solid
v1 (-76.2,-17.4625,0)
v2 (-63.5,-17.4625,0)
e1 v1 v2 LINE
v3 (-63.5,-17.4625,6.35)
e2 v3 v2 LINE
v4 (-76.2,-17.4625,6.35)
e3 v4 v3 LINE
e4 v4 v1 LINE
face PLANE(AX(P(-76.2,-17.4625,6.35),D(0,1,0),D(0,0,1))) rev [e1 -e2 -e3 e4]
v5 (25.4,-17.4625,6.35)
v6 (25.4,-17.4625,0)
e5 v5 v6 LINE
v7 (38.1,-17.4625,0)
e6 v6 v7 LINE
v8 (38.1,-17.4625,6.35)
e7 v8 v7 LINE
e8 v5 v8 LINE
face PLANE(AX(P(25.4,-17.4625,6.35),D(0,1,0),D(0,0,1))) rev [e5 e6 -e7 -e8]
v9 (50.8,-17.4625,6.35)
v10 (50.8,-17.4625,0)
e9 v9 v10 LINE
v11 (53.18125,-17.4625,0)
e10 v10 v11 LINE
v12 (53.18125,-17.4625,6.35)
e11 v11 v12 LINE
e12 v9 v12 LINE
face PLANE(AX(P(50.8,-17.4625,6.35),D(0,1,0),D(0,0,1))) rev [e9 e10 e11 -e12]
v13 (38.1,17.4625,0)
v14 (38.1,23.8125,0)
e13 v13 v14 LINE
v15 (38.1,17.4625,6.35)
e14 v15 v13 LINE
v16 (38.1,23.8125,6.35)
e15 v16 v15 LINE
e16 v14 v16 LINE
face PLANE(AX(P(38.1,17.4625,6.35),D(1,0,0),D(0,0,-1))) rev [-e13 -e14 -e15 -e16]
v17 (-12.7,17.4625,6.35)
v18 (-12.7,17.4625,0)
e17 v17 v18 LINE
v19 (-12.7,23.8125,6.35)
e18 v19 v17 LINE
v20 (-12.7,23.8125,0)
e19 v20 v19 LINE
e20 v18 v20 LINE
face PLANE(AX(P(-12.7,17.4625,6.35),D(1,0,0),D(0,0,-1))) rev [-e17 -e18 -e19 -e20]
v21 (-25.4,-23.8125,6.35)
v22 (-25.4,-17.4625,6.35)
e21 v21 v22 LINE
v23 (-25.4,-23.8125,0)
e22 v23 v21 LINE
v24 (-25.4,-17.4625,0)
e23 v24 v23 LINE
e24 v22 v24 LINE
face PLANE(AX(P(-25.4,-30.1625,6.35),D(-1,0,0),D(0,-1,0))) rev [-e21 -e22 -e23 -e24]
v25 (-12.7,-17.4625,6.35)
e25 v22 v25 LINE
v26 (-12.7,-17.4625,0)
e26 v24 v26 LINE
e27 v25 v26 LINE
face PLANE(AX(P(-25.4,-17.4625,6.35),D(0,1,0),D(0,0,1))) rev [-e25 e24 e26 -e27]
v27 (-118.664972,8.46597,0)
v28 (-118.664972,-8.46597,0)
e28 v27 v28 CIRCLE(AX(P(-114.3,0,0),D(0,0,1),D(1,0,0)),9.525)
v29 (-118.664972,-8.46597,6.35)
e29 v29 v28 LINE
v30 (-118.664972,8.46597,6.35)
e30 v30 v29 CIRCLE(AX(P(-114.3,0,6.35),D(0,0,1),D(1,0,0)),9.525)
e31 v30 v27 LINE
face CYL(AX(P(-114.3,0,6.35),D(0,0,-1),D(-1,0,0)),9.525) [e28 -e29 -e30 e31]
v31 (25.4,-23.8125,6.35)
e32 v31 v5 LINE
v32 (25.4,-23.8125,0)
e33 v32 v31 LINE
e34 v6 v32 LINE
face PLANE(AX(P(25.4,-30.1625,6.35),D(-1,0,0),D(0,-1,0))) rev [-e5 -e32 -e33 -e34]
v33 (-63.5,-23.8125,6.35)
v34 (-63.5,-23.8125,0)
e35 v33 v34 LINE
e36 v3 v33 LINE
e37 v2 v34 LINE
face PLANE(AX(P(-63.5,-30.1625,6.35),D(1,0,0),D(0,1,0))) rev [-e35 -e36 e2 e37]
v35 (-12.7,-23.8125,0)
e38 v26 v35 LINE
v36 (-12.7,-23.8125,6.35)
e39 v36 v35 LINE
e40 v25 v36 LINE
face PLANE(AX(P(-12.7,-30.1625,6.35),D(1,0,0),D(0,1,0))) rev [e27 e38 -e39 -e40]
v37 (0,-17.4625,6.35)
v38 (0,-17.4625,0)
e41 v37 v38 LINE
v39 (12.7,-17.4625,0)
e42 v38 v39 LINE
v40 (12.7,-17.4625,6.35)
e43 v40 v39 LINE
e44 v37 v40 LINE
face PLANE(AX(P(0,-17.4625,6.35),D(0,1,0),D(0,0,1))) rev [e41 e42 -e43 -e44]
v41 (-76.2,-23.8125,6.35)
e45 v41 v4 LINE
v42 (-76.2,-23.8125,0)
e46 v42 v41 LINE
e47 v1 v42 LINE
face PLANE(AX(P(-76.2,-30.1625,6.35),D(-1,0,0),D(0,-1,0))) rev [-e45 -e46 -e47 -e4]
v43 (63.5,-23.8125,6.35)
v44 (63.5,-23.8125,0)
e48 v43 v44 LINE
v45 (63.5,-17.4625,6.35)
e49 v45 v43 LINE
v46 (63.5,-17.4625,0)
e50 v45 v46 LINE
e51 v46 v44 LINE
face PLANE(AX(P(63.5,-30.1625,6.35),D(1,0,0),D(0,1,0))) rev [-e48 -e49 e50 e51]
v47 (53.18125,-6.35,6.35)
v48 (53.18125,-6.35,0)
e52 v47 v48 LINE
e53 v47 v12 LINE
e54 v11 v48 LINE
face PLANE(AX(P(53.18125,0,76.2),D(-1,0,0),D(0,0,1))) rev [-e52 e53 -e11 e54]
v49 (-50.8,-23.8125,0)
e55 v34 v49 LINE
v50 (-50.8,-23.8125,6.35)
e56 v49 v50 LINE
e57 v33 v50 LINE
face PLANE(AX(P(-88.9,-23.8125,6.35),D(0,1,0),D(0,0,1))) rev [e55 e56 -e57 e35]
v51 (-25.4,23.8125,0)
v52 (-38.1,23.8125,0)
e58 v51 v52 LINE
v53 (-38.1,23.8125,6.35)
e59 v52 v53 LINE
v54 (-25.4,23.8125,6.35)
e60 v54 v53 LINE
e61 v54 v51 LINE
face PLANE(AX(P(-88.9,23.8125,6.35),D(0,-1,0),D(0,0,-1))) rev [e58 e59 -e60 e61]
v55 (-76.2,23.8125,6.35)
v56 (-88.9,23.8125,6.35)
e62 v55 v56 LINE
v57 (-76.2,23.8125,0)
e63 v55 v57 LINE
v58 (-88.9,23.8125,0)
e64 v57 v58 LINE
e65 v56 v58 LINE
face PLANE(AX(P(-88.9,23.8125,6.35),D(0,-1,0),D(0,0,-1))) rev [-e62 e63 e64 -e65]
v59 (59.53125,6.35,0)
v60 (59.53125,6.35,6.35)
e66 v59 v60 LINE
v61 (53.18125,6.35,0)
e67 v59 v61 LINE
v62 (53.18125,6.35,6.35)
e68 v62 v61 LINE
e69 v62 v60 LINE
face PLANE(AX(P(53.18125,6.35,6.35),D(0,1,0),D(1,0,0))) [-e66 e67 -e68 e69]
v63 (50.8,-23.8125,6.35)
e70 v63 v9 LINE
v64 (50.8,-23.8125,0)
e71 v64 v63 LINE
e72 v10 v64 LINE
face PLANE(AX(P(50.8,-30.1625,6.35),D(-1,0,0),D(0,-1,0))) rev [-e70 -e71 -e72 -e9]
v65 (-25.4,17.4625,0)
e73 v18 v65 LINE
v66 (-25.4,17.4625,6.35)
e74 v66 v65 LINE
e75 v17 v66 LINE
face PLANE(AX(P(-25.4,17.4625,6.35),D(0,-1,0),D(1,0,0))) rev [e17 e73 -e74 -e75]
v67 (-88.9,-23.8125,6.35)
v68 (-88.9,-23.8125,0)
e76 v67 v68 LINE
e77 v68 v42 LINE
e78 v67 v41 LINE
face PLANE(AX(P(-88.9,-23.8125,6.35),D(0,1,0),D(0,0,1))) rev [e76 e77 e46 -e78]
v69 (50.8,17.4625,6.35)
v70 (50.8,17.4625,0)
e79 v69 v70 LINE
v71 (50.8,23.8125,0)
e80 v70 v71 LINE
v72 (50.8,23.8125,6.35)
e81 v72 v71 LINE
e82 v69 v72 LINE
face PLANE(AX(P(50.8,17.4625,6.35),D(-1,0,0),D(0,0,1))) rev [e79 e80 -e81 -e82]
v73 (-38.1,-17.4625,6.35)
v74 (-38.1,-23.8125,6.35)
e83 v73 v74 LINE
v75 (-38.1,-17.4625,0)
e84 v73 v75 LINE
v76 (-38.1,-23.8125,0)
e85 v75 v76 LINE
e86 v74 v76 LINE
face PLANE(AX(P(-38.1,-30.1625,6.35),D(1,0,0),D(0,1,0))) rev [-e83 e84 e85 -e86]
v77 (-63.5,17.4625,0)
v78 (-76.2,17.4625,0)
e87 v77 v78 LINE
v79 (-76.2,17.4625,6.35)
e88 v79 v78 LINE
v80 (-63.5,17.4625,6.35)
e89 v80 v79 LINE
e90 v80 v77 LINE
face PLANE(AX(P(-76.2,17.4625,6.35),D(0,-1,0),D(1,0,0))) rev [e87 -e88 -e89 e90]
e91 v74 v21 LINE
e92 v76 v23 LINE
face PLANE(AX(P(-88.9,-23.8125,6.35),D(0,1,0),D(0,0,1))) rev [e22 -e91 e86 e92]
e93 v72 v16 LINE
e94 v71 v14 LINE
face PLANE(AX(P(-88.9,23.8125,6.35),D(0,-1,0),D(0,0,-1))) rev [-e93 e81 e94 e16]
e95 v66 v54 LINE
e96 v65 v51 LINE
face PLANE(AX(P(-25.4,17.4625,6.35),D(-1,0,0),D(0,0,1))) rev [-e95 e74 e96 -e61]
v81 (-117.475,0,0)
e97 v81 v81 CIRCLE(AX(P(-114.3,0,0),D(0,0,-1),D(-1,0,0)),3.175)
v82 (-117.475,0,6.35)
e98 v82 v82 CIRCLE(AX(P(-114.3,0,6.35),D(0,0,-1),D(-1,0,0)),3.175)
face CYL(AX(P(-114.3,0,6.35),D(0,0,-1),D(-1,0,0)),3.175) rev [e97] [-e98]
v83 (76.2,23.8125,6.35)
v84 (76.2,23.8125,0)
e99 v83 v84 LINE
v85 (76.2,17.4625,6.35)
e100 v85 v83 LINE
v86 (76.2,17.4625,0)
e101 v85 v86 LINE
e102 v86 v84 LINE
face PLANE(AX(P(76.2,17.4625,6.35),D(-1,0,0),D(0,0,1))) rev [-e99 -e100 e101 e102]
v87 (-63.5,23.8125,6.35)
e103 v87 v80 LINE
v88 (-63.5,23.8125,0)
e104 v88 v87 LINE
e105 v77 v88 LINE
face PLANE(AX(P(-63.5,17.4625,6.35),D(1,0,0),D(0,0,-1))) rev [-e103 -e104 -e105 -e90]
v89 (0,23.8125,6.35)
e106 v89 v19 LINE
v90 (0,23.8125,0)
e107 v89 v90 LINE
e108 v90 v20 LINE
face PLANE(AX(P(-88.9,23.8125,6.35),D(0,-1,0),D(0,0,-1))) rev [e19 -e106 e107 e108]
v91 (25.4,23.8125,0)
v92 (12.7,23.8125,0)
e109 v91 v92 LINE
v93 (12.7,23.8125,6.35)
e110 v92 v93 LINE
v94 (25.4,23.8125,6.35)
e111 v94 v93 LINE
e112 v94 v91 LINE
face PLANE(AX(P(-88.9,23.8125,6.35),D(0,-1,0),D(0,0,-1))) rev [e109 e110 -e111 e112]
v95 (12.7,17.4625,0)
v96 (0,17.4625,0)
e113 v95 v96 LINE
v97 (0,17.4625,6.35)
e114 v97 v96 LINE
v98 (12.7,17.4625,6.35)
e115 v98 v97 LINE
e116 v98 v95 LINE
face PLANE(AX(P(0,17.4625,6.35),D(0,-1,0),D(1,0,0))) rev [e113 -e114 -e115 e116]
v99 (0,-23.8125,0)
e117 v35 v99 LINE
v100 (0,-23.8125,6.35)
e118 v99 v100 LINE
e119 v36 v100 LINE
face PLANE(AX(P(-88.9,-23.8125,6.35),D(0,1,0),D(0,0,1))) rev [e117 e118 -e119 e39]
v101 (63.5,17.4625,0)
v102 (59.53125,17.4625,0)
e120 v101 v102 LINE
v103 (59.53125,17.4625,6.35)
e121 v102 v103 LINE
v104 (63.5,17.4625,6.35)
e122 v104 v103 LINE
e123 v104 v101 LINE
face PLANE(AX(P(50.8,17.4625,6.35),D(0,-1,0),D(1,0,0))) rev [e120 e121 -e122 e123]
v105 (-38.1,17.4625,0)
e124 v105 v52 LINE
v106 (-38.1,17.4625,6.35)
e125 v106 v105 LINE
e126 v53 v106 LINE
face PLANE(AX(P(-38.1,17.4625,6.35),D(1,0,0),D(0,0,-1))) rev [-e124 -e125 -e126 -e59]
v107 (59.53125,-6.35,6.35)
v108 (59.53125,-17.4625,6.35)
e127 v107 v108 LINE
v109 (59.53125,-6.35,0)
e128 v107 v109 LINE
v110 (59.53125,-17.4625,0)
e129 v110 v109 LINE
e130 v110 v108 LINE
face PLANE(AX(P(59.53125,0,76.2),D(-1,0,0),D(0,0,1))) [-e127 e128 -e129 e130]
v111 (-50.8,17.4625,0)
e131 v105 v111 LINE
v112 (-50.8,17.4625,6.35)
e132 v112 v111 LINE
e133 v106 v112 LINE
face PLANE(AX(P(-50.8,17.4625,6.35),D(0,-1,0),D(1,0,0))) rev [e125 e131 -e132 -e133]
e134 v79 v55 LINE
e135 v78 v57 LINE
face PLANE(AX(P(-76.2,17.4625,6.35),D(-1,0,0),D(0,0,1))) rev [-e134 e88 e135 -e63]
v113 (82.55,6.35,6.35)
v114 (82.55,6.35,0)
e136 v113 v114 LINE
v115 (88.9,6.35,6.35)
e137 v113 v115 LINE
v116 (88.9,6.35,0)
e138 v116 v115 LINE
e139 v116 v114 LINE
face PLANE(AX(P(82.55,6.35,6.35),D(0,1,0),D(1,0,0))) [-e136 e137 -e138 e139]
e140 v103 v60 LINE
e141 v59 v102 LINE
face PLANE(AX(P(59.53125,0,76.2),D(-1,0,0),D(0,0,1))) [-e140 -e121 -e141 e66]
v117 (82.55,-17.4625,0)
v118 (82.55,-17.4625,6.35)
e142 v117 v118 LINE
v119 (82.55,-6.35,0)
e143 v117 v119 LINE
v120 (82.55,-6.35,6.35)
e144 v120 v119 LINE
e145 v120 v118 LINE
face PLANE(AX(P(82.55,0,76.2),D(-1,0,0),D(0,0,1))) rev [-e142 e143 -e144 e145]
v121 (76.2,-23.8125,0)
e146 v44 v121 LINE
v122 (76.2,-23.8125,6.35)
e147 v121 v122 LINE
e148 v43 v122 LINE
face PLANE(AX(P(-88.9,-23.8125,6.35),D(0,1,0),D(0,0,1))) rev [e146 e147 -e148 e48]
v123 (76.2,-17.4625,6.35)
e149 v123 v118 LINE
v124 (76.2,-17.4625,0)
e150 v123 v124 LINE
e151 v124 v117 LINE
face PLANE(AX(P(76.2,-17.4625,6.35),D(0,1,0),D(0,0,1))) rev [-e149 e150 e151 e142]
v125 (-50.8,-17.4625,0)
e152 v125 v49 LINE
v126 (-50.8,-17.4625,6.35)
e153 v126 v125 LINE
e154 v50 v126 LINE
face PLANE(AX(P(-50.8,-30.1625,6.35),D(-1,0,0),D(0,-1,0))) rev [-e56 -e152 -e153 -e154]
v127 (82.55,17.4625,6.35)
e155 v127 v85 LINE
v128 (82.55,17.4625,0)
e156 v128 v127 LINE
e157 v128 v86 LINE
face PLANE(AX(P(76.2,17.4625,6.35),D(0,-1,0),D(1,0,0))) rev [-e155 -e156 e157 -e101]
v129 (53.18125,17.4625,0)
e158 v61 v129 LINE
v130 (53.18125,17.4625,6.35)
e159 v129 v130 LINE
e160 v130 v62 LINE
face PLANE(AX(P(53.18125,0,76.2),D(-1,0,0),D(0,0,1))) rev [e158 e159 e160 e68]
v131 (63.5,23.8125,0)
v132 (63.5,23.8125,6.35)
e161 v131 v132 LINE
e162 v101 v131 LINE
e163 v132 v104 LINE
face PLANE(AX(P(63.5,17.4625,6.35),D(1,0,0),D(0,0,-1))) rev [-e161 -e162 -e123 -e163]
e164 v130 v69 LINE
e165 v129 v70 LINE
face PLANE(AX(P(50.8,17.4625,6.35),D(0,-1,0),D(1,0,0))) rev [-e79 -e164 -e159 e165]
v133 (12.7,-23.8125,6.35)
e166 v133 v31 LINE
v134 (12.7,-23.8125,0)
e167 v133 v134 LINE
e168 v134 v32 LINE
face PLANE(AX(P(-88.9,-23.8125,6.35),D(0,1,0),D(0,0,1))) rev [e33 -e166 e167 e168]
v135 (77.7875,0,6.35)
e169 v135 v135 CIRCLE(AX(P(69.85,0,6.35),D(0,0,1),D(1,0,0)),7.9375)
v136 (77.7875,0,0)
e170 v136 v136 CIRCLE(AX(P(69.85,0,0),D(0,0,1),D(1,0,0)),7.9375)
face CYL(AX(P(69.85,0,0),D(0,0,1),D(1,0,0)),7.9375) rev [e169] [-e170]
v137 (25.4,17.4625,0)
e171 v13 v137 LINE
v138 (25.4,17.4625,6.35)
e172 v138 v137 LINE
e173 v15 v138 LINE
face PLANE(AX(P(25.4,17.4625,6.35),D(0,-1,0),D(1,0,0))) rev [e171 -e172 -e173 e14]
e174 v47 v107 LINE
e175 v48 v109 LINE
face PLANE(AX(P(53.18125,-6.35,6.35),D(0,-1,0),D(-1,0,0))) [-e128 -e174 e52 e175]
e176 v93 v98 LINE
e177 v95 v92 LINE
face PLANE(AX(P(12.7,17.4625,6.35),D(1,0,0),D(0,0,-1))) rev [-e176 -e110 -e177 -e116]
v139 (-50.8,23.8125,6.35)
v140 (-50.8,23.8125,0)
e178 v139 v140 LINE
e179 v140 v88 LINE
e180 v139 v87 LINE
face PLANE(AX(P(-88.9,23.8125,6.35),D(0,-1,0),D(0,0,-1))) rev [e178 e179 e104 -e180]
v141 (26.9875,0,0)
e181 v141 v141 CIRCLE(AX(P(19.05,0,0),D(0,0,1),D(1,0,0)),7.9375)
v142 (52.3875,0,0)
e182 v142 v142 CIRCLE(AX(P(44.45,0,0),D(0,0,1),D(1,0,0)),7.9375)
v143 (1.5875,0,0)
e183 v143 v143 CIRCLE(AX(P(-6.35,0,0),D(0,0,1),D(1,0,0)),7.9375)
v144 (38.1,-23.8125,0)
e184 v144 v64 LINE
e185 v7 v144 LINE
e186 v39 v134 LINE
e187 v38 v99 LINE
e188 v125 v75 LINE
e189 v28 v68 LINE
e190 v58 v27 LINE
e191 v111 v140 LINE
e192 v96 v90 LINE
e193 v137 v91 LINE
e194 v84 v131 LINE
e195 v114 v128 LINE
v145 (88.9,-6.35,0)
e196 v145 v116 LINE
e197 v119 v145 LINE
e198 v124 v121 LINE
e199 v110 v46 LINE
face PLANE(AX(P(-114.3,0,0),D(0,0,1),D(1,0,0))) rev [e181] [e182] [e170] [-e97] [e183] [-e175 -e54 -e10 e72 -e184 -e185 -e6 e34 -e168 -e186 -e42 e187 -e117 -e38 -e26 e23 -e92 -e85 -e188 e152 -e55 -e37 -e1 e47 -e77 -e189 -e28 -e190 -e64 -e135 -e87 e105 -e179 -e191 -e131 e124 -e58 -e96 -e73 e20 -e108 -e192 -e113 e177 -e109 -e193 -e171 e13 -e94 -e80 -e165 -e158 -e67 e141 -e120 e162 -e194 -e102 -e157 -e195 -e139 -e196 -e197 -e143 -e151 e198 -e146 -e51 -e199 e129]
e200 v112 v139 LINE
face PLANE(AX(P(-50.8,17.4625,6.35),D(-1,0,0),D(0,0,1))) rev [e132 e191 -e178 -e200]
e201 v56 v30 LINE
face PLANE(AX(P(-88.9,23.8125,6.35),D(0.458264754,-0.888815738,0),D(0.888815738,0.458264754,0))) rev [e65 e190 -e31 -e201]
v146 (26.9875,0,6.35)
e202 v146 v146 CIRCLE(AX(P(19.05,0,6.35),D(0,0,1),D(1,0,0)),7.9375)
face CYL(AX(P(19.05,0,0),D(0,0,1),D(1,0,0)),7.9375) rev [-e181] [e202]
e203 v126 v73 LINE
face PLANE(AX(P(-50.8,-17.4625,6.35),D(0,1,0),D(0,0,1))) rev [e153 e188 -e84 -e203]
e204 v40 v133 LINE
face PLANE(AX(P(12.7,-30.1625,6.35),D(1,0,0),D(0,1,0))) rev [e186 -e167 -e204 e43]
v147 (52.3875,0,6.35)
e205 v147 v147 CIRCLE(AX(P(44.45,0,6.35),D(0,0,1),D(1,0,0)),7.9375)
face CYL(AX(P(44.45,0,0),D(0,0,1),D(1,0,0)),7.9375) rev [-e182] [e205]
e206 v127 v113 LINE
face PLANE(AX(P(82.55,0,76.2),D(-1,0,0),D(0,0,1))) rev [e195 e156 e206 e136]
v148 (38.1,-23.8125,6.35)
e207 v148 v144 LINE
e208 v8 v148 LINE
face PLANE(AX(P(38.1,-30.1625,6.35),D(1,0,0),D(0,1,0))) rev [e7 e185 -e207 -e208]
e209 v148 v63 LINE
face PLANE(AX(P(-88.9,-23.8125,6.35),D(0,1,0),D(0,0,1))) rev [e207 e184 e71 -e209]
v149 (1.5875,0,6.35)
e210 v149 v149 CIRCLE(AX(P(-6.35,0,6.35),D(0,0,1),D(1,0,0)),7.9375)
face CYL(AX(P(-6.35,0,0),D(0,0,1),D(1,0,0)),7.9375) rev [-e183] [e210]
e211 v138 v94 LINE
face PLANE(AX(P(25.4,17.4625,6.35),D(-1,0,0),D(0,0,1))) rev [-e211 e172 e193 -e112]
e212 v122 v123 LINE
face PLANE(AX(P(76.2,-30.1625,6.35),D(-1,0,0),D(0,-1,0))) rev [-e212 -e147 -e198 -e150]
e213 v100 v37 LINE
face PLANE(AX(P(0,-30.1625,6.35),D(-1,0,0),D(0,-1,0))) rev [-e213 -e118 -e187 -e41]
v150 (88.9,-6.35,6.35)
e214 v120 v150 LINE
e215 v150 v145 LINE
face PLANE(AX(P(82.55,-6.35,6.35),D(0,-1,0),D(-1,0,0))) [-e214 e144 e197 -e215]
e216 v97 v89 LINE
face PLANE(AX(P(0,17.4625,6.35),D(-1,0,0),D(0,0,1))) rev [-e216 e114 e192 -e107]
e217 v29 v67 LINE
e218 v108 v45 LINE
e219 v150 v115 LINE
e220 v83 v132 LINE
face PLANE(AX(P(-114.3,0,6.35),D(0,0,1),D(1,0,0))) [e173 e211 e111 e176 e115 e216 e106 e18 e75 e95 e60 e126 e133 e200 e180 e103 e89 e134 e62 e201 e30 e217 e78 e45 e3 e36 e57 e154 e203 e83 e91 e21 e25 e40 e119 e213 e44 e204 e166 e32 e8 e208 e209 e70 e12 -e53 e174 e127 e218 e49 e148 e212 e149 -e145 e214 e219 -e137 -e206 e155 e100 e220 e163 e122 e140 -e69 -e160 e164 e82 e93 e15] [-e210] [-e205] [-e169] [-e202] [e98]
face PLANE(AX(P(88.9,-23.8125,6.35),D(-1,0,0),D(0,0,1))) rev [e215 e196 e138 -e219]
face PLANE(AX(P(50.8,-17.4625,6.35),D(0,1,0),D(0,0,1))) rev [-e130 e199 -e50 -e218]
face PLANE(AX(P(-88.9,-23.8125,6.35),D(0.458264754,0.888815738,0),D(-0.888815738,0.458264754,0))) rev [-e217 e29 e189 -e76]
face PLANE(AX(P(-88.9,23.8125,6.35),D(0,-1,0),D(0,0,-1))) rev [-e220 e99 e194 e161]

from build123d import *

# Parameters (mm, degrees)
MASS_DEPTH          = 6.35
SKETCH4_R           = 3.175
CUT_EXTRUDE1_DEPTH  = 127.253666407
SKETCH3_W           = 12.7
SKETCH3_H           = 12.7
CUT_EXTRUDE2_DEPTH  = 127.253666407
LPATTERN1_COUNT     = 7
LPATTERN1_PITCH     = 25.4
SKETCH5_R           = 7.9375
CUT_EXTRUDE3_DEPTH  = 127.253666407
LPATTERN2_COUNT     = 4
LPATTERN2_PITCH     = 25.4
CAVITY1_START       = 53.18125
CAVITY1_OUTLINE_W   = 11.1125
CAVITY1_OUTLINE_H   = 6.35
CAVITY1_DEPTH       = 6.35
CAVITY1_START_2     = 82.55
CAVITY1_2_OUTLINE_W = 11.1125
CAVITY1_2_OUTLINE_H = 6.35
CAVITY1_2_DEPTH     = 6.35


# Read off the part's stored shape, not the designer's step: Cavity1
with BuildPart() as part:
    # Sketch1 → Mass (new body)
    with BuildSketch(Plane.XY):
        with BuildLine():
            Line((-88.9, -23.8125), (88.9, -23.8125))
            Line((88.9, -23.8125), (88.9, 23.8125))
            Line((88.9, 23.8125), (-88.9, 23.8125))
            Line((-88.9, 23.8125), (-118.664971781, 8.4659699))
            ThreePointArc((-118.664971781, 8.4659699), (-123.825, 0), (-118.664971781, -8.4659699))
            Line((-118.664971781, -8.4659699), (-88.9, -23.8125))
        make_face()
    extrude(amount=MASS_DEPTH)

    # Sketch4 → Cut-Extrude1 (cut, through all)
    with BuildSketch(Plane(origin=(0, 0, 0), x_dir=(-1, 0, 0), z_dir=(0, 0, -1))):
        with Locations((114.3, 0)):
            Circle(SKETCH4_R)
    extrude(amount=-CUT_EXTRUDE1_DEPTH, mode=Mode.SUBTRACT)

    # Sketch3 → Cut-Extrude2 (cut, through all)
    with BuildSketch(Plane(origin=(0, 0, 0), x_dir=(-1, 0, 0), z_dir=(0, 0, -1))):
        with Locations((-82.55, 23.8125)):
            Rectangle(SKETCH3_W, SKETCH3_H)
        with Locations((-82.55, -23.8125)):
            Rectangle(SKETCH3_W, SKETCH3_H)
    cut_extrude2 = extrude(amount=-CUT_EXTRUDE2_DEPTH, mode=Mode.SUBTRACT)

    # LPattern1: Cut-Extrude2 ×7
    with Locations(*[(-i * LPATTERN1_PITCH, 0, 0) for i in range(1, LPATTERN1_COUNT)]):
        add(cut_extrude2, mode=Mode.SUBTRACT)

    # Sketch5 → Cut-Extrude3 (cut, through all)
    with BuildSketch(Plane.XY.offset(6.35)):
        with Locations((69.85, 0)):
            Circle(SKETCH5_R)
    cut_extrude3 = extrude(amount=-CUT_EXTRUDE3_DEPTH, mode=Mode.SUBTRACT)

    # LPattern2: Cut-Extrude3 ×4
    with Locations(*[(-i * LPATTERN2_PITCH, 0, 0) for i in range(1, LPATTERN2_COUNT)]):
        add(cut_extrude3, mode=Mode.SUBTRACT)

    # Cavity1 outline → Cavity1 (cut)
    with BuildSketch(Plane.YZ.offset(CAVITY1_START)):
        with Locations((-11.90625, 3.175)):
            Rectangle(CAVITY1_OUTLINE_W, CAVITY1_OUTLINE_H)
        with Locations((11.90625, 3.175)):
            Rectangle(CAVITY1_OUTLINE_W, CAVITY1_OUTLINE_H)
    extrude(amount=CAVITY1_DEPTH, mode=Mode.SUBTRACT)

    # Cavity1 2 outline → Cavity1 2 (cut)
    with BuildSketch(Plane.YZ.offset(CAVITY1_START_2)):
        with Locations((-11.90625, 3.175)):
            Rectangle(CAVITY1_2_OUTLINE_W, CAVITY1_2_OUTLINE_H)
        with Locations((11.90625, 3.175)):
            Rectangle(CAVITY1_2_OUTLINE_W, CAVITY1_2_OUTLINE_H)
    extrude(amount=CAVITY1_2_DEPTH, mode=Mode.SUBTRACT)


solid = part.part
